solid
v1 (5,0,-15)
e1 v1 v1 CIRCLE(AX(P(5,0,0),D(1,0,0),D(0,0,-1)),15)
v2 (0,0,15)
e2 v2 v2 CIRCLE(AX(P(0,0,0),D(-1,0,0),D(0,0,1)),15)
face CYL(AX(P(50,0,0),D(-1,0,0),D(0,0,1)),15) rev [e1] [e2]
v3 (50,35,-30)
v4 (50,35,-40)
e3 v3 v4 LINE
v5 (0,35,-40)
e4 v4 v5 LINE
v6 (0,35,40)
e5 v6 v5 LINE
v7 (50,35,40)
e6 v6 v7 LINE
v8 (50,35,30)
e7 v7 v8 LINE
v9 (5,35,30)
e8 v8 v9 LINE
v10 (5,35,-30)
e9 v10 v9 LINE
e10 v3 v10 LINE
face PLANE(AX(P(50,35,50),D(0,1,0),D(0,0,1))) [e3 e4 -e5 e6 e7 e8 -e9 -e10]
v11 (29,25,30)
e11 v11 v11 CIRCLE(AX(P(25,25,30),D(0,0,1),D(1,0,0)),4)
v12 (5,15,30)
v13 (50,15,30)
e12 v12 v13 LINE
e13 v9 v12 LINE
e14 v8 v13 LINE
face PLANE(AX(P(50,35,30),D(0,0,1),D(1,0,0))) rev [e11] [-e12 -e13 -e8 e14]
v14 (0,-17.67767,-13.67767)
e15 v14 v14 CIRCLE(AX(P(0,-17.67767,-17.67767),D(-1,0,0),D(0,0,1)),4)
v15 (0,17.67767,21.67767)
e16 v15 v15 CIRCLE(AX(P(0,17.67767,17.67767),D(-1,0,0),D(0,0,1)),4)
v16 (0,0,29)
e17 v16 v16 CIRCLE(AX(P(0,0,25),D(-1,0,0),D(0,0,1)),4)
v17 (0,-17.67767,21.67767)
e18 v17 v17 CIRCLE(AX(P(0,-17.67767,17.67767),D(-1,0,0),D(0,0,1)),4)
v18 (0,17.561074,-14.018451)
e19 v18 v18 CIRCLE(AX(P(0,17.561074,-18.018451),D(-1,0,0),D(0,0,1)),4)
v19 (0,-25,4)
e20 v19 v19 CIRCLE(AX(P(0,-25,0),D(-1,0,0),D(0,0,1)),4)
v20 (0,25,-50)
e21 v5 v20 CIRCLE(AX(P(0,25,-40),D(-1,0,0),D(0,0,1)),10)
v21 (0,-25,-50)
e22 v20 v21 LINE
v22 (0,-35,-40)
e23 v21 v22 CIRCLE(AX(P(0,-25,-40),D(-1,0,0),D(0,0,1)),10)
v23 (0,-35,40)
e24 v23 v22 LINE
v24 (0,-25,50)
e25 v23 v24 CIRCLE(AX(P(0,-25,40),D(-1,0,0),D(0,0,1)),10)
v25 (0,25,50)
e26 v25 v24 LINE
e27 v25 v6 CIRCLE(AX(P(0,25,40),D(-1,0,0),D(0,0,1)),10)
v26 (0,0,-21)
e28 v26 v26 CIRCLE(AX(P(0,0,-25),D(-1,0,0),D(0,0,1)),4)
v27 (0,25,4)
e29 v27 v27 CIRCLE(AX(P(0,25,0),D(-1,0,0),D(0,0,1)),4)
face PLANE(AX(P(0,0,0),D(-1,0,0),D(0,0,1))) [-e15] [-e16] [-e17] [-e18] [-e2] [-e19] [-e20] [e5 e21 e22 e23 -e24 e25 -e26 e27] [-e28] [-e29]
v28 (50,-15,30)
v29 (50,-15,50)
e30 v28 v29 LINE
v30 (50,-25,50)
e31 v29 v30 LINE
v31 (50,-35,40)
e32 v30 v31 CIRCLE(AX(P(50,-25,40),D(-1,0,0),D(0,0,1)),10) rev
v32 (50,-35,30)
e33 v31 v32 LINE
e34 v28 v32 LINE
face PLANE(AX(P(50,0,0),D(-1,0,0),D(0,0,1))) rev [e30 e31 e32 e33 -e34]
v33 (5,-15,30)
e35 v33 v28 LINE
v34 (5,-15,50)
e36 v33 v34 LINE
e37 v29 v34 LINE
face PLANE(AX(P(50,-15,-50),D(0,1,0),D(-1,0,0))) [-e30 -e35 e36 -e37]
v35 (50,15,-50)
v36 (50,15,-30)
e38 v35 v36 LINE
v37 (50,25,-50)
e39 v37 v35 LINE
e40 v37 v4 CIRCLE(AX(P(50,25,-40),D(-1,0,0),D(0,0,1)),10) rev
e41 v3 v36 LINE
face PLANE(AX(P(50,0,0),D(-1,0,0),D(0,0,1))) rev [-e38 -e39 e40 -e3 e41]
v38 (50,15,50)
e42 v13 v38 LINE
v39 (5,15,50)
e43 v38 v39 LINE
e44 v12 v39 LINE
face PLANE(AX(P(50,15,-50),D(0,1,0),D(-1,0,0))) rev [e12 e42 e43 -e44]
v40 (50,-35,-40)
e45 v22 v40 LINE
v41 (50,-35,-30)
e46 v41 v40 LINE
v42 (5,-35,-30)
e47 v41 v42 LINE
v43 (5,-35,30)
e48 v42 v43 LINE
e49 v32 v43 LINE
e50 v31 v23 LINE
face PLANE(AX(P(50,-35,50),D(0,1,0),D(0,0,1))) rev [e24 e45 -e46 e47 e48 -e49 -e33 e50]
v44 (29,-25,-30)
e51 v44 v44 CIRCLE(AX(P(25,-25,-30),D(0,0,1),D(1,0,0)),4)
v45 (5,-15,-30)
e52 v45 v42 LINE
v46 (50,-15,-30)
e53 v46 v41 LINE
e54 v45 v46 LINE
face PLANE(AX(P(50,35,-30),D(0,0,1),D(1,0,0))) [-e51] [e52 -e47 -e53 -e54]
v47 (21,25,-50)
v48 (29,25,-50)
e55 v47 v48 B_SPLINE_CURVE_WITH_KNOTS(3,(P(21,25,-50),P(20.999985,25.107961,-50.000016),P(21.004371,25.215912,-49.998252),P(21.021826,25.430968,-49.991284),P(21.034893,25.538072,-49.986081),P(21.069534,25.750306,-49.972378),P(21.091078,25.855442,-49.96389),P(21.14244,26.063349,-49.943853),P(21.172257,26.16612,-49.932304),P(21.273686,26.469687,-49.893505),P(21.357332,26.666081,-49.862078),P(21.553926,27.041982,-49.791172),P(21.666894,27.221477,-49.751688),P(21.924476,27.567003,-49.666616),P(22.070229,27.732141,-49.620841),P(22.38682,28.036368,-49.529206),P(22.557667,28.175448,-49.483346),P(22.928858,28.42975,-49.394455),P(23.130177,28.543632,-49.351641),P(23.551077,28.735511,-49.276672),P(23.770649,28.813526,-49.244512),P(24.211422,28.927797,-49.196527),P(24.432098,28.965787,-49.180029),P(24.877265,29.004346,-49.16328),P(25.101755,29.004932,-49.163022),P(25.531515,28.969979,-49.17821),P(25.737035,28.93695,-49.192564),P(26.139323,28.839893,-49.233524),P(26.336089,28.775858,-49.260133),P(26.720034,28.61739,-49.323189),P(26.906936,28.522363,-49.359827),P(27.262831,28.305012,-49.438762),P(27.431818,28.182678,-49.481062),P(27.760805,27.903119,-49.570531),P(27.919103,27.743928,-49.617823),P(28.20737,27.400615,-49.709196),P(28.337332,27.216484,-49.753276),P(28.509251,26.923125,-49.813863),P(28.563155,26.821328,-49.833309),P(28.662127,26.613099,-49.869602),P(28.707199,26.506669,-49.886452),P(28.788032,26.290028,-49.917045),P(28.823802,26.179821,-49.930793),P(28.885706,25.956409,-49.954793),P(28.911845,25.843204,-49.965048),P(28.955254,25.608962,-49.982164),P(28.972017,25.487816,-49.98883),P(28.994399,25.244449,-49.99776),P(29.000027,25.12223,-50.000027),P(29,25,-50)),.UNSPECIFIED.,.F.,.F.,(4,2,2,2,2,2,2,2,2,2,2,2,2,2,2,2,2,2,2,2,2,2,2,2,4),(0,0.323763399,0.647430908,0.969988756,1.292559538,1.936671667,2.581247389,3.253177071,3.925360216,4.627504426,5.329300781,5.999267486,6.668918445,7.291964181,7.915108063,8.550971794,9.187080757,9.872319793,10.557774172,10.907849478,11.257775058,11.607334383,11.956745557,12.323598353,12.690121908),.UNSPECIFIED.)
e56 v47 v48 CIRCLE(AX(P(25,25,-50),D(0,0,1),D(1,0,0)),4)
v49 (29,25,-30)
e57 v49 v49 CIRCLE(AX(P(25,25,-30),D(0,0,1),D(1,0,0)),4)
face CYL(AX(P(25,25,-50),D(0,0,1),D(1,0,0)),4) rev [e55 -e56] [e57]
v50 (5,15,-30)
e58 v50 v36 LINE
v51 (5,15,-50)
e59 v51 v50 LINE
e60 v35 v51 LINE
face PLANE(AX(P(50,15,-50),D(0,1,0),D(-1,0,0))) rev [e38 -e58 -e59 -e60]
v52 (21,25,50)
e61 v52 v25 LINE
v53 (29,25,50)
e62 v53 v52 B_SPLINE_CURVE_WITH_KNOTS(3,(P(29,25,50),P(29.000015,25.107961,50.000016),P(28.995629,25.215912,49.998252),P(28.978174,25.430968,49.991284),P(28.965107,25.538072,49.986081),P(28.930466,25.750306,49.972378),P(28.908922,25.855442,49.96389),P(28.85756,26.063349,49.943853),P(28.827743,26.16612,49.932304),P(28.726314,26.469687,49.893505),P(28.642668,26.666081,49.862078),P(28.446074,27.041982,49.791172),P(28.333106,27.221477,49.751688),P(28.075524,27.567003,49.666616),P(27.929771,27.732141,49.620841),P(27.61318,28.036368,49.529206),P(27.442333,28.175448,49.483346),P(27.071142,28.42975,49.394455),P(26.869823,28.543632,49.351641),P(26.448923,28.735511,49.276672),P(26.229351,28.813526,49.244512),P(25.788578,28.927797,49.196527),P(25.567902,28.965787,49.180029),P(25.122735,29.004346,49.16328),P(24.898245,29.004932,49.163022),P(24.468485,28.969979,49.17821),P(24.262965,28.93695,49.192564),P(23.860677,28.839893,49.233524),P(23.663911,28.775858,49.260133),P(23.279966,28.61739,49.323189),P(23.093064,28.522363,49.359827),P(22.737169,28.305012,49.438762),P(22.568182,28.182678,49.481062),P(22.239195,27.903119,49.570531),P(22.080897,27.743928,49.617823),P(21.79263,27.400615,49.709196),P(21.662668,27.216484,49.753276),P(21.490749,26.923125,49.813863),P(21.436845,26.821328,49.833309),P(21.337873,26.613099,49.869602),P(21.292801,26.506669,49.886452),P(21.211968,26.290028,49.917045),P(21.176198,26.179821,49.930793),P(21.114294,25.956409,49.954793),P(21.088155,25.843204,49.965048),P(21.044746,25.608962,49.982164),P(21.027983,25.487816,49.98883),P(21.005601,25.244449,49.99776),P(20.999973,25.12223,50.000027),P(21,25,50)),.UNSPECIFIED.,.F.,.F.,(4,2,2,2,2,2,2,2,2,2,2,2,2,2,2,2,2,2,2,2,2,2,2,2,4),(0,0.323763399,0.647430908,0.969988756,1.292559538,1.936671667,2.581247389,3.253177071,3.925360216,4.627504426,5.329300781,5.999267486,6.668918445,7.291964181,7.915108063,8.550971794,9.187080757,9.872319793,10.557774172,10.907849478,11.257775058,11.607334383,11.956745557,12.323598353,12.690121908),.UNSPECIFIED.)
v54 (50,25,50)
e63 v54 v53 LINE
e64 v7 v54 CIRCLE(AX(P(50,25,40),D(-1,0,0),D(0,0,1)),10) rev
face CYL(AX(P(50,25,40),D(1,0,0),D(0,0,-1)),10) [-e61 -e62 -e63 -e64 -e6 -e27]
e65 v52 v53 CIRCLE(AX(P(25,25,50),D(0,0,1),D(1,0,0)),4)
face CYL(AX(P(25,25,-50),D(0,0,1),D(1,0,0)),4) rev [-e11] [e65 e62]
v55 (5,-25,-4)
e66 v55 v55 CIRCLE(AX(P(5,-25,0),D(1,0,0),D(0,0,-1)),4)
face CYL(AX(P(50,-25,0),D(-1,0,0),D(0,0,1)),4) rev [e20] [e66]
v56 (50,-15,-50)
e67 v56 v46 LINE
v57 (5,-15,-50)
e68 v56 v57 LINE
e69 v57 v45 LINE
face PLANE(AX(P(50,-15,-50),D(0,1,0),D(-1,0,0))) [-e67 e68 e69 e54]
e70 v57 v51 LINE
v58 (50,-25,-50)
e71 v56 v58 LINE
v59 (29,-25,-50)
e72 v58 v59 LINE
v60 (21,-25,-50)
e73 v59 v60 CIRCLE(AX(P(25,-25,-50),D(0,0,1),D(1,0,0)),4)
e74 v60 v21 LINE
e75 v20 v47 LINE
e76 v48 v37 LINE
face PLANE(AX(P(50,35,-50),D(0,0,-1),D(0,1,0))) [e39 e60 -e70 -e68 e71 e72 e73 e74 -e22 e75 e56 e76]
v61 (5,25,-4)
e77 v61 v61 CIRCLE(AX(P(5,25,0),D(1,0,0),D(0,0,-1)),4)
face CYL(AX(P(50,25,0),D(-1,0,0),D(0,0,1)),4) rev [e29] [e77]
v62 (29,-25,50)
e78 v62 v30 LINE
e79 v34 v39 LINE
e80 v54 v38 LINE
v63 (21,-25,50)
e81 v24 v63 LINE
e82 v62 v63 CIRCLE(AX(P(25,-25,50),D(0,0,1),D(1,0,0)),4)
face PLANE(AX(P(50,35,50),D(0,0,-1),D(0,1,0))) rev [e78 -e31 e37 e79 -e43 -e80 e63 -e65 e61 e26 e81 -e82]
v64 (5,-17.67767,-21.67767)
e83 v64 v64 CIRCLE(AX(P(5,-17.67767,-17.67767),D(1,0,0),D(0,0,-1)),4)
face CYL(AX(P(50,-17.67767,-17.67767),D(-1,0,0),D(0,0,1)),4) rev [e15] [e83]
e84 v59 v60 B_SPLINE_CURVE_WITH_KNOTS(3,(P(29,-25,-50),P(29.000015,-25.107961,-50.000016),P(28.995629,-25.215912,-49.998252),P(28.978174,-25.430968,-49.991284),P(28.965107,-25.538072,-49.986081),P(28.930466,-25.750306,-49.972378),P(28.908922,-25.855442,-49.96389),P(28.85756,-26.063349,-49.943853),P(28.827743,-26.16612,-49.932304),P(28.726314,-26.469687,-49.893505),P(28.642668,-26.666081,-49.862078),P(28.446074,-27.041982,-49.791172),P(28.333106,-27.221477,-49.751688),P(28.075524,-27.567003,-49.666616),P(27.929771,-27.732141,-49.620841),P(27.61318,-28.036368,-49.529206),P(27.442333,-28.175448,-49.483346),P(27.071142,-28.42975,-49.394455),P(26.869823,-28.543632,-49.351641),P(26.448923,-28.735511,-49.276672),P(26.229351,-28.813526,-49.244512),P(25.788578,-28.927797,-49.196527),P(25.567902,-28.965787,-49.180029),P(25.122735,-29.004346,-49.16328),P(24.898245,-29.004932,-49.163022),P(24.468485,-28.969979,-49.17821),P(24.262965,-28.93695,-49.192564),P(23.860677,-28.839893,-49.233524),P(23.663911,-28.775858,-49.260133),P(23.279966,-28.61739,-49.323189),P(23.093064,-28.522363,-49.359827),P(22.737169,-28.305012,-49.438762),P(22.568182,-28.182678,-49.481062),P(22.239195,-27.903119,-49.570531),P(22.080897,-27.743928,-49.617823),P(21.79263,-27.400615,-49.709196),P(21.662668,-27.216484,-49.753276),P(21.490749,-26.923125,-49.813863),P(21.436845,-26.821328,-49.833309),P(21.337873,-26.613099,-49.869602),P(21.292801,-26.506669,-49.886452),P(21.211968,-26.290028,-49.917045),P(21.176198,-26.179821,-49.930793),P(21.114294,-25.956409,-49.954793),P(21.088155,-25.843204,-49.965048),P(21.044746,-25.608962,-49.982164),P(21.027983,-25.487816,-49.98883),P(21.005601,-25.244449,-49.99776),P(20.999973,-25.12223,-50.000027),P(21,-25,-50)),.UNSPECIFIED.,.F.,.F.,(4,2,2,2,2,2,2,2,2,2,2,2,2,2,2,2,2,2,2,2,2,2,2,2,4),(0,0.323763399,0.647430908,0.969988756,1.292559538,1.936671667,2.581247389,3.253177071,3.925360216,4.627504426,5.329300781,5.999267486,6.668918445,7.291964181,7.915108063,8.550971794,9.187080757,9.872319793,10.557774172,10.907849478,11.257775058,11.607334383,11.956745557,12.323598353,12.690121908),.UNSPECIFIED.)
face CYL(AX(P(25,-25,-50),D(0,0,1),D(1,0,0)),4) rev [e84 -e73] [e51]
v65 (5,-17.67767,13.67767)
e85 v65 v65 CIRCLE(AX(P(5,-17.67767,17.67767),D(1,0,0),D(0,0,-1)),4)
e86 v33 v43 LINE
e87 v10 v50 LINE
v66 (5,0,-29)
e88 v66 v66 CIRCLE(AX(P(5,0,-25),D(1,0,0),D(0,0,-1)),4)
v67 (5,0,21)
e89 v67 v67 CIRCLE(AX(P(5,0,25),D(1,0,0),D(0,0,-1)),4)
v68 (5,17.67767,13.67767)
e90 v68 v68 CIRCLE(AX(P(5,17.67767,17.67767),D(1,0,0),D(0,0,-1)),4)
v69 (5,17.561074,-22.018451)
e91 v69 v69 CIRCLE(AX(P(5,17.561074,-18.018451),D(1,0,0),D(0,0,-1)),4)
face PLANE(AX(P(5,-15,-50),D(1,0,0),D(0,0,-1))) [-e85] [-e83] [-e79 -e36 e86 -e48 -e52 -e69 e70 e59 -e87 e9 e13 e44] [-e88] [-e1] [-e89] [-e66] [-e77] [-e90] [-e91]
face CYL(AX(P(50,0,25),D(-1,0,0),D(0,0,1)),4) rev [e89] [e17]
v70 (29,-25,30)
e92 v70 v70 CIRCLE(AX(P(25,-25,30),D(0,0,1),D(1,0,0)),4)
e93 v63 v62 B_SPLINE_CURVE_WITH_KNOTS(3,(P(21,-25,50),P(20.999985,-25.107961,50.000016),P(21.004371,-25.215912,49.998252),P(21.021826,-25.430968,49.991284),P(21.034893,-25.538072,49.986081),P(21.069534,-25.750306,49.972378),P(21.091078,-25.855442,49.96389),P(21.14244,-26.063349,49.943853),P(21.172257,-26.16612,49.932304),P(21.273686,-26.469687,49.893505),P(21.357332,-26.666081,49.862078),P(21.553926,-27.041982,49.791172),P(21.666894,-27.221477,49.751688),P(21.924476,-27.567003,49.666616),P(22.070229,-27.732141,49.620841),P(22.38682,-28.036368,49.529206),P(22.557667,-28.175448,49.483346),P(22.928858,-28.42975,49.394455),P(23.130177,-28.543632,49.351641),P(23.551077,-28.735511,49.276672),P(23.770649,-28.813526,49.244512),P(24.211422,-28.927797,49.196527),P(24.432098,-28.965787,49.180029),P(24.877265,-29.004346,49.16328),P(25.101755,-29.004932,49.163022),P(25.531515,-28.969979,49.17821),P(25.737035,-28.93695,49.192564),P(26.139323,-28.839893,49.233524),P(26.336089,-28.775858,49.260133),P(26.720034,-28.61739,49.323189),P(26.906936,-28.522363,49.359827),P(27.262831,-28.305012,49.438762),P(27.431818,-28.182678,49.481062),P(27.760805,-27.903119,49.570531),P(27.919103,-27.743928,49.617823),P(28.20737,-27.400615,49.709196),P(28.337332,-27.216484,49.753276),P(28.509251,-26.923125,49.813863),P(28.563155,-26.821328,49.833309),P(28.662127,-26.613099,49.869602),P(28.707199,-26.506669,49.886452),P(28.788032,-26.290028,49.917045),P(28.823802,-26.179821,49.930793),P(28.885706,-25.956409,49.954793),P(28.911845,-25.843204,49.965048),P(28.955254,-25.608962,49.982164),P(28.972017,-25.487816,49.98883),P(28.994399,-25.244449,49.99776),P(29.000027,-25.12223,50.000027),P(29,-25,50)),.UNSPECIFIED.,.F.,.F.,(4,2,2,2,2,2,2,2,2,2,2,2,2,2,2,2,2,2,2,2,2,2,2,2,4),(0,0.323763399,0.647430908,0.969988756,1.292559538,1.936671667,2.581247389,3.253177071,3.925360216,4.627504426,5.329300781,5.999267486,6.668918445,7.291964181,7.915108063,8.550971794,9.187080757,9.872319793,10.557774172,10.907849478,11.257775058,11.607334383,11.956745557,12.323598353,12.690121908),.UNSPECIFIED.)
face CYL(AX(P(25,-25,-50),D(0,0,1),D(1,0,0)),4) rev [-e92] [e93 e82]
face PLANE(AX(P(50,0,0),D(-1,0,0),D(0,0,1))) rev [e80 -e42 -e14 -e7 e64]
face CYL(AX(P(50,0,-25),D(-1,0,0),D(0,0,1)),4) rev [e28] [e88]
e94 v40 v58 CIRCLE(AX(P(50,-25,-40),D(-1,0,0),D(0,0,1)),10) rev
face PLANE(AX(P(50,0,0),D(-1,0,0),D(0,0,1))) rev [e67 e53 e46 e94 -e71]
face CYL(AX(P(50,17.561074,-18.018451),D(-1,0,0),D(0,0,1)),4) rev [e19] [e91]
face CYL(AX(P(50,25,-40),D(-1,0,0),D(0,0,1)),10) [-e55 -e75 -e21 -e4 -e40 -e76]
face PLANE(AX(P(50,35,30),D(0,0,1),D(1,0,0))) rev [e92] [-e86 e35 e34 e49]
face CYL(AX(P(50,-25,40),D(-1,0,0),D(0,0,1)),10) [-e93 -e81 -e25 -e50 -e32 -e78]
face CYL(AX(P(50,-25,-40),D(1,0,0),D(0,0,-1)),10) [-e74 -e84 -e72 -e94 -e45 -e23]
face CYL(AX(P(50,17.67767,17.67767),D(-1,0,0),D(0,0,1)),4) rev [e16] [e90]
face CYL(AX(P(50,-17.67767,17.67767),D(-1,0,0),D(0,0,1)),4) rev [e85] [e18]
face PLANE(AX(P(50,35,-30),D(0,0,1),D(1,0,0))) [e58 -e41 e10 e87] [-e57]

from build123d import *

# Parameters (mm, degrees)
ESBO_O1_W                = 100
ESBO_O1_H                = 70
RESSALTO_EXTRUS_O1_DEPTH = 50
ESBO_O3_W                = 45
ESBO_O3_H                = 30
CORTE_EXTRUS_O1_DEPTH    = 118.153745139
ESBO_O4_W                = 45
ESBO_O4_H                = 60
CORTE_EXTRUS_O2_DEPTH    = 100.498743711
ESBO_O5_R                = 15
CORTE_EXTRUS_O3_DEPTH    = 79.89866919
ESBO_O6_R                = 4
CORTE_EXTRUS_O4_DEPTH    = 79.89866919
ESBO_O6_3_R              = 4
CORTE_EXTRUS_O5_DEPTH    = 50
ESBO_O6_4_R              = 4
CORTE_EXTRUS_O6_DEPTH    = 50
ESBO_O6_5_R              = 4
CORTE_EXTRUS_O7_DEPTH    = 50
ESBO_O6_6_R              = 4
CORTE_EXTRUS_O8_DEPTH    = 50
ESBO_O6_7_R              = 4
CORTE_EXTRUS_O9_DEPTH    = 50
ESBO_O6_8_R              = 4
CORTE_EXTRUS_O10_DEPTH   = 50
ESBO_O8_R                = 4
CORTE_EXTRUS_O11_DEPTH   = 50
ESBO_O9_R                = 4
CORTE_EXTRUS_O12_DEPTH   = 118.153745139
ESBO_O10_R               = 4
CORTE_EXTRUS_O13_DEPTH   = 118.153745139
FILETE2_R                = 10
FILETE3_R                = 10
FILETE4_R                = 10
FILETE5_R                = 10


with BuildPart() as part:
    # Esboço1 → Ressalto-extrusão1 (new body)
    with BuildSketch(Plane(origin=(0, 0, 0), x_dir=(0, 0, -1), z_dir=(1, 0, 0))):
        Rectangle(ESBO_O1_W, ESBO_O1_H)
    extrude(amount=RESSALTO_EXTRUS_O1_DEPTH)

    # Esboço3 → Corte-extrusão1 (cut, through all)
    with BuildSketch(Plane.XY.offset(50)):
        with Locations((27.5, 0)):
            Rectangle(ESBO_O3_W, ESBO_O3_H)
    extrude(amount=-CORTE_EXTRUS_O1_DEPTH, mode=Mode.SUBTRACT)

    # Esboço4 → Corte-extrusão2 (cut, through all)
    with BuildSketch(Plane(origin=(0, -35, 0), x_dir=(-1, 0, 0), z_dir=(0, -1, 0))):
        with Locations((-27.5, 0)):
            Rectangle(ESBO_O4_W, ESBO_O4_H)
    extrude(amount=-CORTE_EXTRUS_O2_DEPTH, mode=Mode.SUBTRACT)

    # Esboço5 → Corte-extrusão3 (cut, through all)
    with BuildSketch(Plane.ZY):
        Circle(ESBO_O5_R)
    extrude(amount=-CORTE_EXTRUS_O3_DEPTH, mode=Mode.SUBTRACT)

    # Esboço6 → Corte-extrusão4 (cut, through all)
    with BuildSketch(Plane.ZY):
        with Locations((-25, 0)):
            Circle(ESBO_O6_R)
    extrude(amount=-CORTE_EXTRUS_O4_DEPTH, mode=Mode.SUBTRACT)

    # Esboço6<3> → Corte-extrusão5 (cut)
    with BuildSketch(Plane.ZY):
        with Locations((-17.67766953, -17.67766953)):
            Circle(ESBO_O6_3_R)
    extrude(amount=-CORTE_EXTRUS_O5_DEPTH, mode=Mode.SUBTRACT)

    # Esboço6<4> → Corte-extrusão6 (cut)
    with BuildSketch(Plane.ZY):
        with Locations((0, -25)):
            Circle(ESBO_O6_4_R)
    extrude(amount=-CORTE_EXTRUS_O6_DEPTH, mode=Mode.SUBTRACT)

    # Esboço6<5> → Corte-extrusão7 (cut)
    with BuildSketch(Plane.ZY):
        with Locations((17.67766953, -17.67766953)):
            Circle(ESBO_O6_5_R)
    extrude(amount=-CORTE_EXTRUS_O7_DEPTH, mode=Mode.SUBTRACT)

    # Esboço6<6> → Corte-extrusão8 (cut)
    with BuildSketch(Plane.ZY):
        with Locations((25, 0)):
            Circle(ESBO_O6_6_R)
    extrude(amount=-CORTE_EXTRUS_O8_DEPTH, mode=Mode.SUBTRACT)

    # Esboço6<7> → Corte-extrusão9 (cut)
    with BuildSketch(Plane.ZY):
        with Locations((17.67766953, 17.67766953)):
            Circle(ESBO_O6_7_R)
    extrude(amount=-CORTE_EXTRUS_O9_DEPTH, mode=Mode.SUBTRACT)

    # Esboço6<8> → Corte-extrusão10 (cut)
    with BuildSketch(Plane.ZY):
        with Locations((0, 25)):
            Circle(ESBO_O6_8_R)
    extrude(amount=-CORTE_EXTRUS_O10_DEPTH, mode=Mode.SUBTRACT)

    # Esboço8 → Corte-extrusão11 (cut)
    with BuildSketch(Plane.ZY):
        with Locations((-18.018451128, 17.56107414)):
            Circle(ESBO_O8_R)
    extrude(amount=-CORTE_EXTRUS_O11_DEPTH, mode=Mode.SUBTRACT)

    # Esboço9 → Corte-extrusão12 (cut, through all)
    with BuildSketch(Plane.XY.offset(50)):
        with Locations((25, -25)):
            Circle(ESBO_O9_R)
    extrude(amount=-CORTE_EXTRUS_O12_DEPTH, mode=Mode.SUBTRACT)

    # Esboço10 → Corte-extrusão13 (cut, through all)
    with BuildSketch(Plane.XY.offset(50)):
        with Locations((25, 25)):
            Circle(ESBO_O10_R)
    extrude(amount=-CORTE_EXTRUS_O13_DEPTH, mode=Mode.SUBTRACT)

    # Filete2
    # the kernel refuses this fillet: 10 mm, written as the material it takes off along each edge
    with BuildSketch(Plane(origin=(-25, -35, 50), x_dir=(0, 1, 0), z_dir=(1, 0, 0))) as filete2_piece_1:
        with BuildLine():
            CenterArc((FILETE2_R, -FILETE2_R), FILETE2_R, 90, 90)
            Line((0, -FILETE2_R), (0, 0))
            Line((0, 0), (FILETE2_R, 0))
        make_face()
    extrude(amount=100, mode=Mode.SUBTRACT)

    # Filete3
    # the kernel refuses this fillet: 10 mm, written as the material it takes off along each edge
    with BuildSketch(Plane(origin=(-25, 35, 50), x_dir=(0, 0, -1), z_dir=(1, 0, 0))) as filete3_piece_1:
        with BuildLine():
            CenterArc((FILETE3_R, -FILETE3_R), FILETE3_R, 90, 90)
            Line((0, -FILETE3_R), (0, 0))
            Line((0, 0), (FILETE3_R, 0))
        make_face()
    extrude(amount=100, mode=Mode.SUBTRACT)

    # Filete4
    # the kernel refuses this fillet: 10 mm, written as the material it takes off along each edge
    with BuildSketch(Plane(origin=(-25, 35, -50), x_dir=(0, 0, 1), z_dir=(1, 0, 0))) as filete4_piece_1:
        with BuildLine():
            CenterArc((FILETE4_R, FILETE4_R), FILETE4_R, 180, 90)
            Line((0, FILETE4_R), (0, 0))
            Line((0, 0), (FILETE4_R, 0))
        make_face()
    extrude(amount=100, mode=Mode.SUBTRACT)

    # Filete5
    # the kernel refuses this fillet: 10 mm, written as the material it takes off along each edge
    with BuildSketch(Plane(origin=(-25, -35, -50), x_dir=(0, 0, 1), z_dir=(1, 0, 0))) as filete5_piece_1:
        with BuildLine():
            CenterArc((FILETE5_R, -FILETE5_R), FILETE5_R, 90, 90)
            Line((0, -FILETE5_R), (0, 0))
            Line((0, 0), (FILETE5_R, 0))
        make_face()
    extrude(amount=100, mode=Mode.SUBTRACT)


solid = part.part
